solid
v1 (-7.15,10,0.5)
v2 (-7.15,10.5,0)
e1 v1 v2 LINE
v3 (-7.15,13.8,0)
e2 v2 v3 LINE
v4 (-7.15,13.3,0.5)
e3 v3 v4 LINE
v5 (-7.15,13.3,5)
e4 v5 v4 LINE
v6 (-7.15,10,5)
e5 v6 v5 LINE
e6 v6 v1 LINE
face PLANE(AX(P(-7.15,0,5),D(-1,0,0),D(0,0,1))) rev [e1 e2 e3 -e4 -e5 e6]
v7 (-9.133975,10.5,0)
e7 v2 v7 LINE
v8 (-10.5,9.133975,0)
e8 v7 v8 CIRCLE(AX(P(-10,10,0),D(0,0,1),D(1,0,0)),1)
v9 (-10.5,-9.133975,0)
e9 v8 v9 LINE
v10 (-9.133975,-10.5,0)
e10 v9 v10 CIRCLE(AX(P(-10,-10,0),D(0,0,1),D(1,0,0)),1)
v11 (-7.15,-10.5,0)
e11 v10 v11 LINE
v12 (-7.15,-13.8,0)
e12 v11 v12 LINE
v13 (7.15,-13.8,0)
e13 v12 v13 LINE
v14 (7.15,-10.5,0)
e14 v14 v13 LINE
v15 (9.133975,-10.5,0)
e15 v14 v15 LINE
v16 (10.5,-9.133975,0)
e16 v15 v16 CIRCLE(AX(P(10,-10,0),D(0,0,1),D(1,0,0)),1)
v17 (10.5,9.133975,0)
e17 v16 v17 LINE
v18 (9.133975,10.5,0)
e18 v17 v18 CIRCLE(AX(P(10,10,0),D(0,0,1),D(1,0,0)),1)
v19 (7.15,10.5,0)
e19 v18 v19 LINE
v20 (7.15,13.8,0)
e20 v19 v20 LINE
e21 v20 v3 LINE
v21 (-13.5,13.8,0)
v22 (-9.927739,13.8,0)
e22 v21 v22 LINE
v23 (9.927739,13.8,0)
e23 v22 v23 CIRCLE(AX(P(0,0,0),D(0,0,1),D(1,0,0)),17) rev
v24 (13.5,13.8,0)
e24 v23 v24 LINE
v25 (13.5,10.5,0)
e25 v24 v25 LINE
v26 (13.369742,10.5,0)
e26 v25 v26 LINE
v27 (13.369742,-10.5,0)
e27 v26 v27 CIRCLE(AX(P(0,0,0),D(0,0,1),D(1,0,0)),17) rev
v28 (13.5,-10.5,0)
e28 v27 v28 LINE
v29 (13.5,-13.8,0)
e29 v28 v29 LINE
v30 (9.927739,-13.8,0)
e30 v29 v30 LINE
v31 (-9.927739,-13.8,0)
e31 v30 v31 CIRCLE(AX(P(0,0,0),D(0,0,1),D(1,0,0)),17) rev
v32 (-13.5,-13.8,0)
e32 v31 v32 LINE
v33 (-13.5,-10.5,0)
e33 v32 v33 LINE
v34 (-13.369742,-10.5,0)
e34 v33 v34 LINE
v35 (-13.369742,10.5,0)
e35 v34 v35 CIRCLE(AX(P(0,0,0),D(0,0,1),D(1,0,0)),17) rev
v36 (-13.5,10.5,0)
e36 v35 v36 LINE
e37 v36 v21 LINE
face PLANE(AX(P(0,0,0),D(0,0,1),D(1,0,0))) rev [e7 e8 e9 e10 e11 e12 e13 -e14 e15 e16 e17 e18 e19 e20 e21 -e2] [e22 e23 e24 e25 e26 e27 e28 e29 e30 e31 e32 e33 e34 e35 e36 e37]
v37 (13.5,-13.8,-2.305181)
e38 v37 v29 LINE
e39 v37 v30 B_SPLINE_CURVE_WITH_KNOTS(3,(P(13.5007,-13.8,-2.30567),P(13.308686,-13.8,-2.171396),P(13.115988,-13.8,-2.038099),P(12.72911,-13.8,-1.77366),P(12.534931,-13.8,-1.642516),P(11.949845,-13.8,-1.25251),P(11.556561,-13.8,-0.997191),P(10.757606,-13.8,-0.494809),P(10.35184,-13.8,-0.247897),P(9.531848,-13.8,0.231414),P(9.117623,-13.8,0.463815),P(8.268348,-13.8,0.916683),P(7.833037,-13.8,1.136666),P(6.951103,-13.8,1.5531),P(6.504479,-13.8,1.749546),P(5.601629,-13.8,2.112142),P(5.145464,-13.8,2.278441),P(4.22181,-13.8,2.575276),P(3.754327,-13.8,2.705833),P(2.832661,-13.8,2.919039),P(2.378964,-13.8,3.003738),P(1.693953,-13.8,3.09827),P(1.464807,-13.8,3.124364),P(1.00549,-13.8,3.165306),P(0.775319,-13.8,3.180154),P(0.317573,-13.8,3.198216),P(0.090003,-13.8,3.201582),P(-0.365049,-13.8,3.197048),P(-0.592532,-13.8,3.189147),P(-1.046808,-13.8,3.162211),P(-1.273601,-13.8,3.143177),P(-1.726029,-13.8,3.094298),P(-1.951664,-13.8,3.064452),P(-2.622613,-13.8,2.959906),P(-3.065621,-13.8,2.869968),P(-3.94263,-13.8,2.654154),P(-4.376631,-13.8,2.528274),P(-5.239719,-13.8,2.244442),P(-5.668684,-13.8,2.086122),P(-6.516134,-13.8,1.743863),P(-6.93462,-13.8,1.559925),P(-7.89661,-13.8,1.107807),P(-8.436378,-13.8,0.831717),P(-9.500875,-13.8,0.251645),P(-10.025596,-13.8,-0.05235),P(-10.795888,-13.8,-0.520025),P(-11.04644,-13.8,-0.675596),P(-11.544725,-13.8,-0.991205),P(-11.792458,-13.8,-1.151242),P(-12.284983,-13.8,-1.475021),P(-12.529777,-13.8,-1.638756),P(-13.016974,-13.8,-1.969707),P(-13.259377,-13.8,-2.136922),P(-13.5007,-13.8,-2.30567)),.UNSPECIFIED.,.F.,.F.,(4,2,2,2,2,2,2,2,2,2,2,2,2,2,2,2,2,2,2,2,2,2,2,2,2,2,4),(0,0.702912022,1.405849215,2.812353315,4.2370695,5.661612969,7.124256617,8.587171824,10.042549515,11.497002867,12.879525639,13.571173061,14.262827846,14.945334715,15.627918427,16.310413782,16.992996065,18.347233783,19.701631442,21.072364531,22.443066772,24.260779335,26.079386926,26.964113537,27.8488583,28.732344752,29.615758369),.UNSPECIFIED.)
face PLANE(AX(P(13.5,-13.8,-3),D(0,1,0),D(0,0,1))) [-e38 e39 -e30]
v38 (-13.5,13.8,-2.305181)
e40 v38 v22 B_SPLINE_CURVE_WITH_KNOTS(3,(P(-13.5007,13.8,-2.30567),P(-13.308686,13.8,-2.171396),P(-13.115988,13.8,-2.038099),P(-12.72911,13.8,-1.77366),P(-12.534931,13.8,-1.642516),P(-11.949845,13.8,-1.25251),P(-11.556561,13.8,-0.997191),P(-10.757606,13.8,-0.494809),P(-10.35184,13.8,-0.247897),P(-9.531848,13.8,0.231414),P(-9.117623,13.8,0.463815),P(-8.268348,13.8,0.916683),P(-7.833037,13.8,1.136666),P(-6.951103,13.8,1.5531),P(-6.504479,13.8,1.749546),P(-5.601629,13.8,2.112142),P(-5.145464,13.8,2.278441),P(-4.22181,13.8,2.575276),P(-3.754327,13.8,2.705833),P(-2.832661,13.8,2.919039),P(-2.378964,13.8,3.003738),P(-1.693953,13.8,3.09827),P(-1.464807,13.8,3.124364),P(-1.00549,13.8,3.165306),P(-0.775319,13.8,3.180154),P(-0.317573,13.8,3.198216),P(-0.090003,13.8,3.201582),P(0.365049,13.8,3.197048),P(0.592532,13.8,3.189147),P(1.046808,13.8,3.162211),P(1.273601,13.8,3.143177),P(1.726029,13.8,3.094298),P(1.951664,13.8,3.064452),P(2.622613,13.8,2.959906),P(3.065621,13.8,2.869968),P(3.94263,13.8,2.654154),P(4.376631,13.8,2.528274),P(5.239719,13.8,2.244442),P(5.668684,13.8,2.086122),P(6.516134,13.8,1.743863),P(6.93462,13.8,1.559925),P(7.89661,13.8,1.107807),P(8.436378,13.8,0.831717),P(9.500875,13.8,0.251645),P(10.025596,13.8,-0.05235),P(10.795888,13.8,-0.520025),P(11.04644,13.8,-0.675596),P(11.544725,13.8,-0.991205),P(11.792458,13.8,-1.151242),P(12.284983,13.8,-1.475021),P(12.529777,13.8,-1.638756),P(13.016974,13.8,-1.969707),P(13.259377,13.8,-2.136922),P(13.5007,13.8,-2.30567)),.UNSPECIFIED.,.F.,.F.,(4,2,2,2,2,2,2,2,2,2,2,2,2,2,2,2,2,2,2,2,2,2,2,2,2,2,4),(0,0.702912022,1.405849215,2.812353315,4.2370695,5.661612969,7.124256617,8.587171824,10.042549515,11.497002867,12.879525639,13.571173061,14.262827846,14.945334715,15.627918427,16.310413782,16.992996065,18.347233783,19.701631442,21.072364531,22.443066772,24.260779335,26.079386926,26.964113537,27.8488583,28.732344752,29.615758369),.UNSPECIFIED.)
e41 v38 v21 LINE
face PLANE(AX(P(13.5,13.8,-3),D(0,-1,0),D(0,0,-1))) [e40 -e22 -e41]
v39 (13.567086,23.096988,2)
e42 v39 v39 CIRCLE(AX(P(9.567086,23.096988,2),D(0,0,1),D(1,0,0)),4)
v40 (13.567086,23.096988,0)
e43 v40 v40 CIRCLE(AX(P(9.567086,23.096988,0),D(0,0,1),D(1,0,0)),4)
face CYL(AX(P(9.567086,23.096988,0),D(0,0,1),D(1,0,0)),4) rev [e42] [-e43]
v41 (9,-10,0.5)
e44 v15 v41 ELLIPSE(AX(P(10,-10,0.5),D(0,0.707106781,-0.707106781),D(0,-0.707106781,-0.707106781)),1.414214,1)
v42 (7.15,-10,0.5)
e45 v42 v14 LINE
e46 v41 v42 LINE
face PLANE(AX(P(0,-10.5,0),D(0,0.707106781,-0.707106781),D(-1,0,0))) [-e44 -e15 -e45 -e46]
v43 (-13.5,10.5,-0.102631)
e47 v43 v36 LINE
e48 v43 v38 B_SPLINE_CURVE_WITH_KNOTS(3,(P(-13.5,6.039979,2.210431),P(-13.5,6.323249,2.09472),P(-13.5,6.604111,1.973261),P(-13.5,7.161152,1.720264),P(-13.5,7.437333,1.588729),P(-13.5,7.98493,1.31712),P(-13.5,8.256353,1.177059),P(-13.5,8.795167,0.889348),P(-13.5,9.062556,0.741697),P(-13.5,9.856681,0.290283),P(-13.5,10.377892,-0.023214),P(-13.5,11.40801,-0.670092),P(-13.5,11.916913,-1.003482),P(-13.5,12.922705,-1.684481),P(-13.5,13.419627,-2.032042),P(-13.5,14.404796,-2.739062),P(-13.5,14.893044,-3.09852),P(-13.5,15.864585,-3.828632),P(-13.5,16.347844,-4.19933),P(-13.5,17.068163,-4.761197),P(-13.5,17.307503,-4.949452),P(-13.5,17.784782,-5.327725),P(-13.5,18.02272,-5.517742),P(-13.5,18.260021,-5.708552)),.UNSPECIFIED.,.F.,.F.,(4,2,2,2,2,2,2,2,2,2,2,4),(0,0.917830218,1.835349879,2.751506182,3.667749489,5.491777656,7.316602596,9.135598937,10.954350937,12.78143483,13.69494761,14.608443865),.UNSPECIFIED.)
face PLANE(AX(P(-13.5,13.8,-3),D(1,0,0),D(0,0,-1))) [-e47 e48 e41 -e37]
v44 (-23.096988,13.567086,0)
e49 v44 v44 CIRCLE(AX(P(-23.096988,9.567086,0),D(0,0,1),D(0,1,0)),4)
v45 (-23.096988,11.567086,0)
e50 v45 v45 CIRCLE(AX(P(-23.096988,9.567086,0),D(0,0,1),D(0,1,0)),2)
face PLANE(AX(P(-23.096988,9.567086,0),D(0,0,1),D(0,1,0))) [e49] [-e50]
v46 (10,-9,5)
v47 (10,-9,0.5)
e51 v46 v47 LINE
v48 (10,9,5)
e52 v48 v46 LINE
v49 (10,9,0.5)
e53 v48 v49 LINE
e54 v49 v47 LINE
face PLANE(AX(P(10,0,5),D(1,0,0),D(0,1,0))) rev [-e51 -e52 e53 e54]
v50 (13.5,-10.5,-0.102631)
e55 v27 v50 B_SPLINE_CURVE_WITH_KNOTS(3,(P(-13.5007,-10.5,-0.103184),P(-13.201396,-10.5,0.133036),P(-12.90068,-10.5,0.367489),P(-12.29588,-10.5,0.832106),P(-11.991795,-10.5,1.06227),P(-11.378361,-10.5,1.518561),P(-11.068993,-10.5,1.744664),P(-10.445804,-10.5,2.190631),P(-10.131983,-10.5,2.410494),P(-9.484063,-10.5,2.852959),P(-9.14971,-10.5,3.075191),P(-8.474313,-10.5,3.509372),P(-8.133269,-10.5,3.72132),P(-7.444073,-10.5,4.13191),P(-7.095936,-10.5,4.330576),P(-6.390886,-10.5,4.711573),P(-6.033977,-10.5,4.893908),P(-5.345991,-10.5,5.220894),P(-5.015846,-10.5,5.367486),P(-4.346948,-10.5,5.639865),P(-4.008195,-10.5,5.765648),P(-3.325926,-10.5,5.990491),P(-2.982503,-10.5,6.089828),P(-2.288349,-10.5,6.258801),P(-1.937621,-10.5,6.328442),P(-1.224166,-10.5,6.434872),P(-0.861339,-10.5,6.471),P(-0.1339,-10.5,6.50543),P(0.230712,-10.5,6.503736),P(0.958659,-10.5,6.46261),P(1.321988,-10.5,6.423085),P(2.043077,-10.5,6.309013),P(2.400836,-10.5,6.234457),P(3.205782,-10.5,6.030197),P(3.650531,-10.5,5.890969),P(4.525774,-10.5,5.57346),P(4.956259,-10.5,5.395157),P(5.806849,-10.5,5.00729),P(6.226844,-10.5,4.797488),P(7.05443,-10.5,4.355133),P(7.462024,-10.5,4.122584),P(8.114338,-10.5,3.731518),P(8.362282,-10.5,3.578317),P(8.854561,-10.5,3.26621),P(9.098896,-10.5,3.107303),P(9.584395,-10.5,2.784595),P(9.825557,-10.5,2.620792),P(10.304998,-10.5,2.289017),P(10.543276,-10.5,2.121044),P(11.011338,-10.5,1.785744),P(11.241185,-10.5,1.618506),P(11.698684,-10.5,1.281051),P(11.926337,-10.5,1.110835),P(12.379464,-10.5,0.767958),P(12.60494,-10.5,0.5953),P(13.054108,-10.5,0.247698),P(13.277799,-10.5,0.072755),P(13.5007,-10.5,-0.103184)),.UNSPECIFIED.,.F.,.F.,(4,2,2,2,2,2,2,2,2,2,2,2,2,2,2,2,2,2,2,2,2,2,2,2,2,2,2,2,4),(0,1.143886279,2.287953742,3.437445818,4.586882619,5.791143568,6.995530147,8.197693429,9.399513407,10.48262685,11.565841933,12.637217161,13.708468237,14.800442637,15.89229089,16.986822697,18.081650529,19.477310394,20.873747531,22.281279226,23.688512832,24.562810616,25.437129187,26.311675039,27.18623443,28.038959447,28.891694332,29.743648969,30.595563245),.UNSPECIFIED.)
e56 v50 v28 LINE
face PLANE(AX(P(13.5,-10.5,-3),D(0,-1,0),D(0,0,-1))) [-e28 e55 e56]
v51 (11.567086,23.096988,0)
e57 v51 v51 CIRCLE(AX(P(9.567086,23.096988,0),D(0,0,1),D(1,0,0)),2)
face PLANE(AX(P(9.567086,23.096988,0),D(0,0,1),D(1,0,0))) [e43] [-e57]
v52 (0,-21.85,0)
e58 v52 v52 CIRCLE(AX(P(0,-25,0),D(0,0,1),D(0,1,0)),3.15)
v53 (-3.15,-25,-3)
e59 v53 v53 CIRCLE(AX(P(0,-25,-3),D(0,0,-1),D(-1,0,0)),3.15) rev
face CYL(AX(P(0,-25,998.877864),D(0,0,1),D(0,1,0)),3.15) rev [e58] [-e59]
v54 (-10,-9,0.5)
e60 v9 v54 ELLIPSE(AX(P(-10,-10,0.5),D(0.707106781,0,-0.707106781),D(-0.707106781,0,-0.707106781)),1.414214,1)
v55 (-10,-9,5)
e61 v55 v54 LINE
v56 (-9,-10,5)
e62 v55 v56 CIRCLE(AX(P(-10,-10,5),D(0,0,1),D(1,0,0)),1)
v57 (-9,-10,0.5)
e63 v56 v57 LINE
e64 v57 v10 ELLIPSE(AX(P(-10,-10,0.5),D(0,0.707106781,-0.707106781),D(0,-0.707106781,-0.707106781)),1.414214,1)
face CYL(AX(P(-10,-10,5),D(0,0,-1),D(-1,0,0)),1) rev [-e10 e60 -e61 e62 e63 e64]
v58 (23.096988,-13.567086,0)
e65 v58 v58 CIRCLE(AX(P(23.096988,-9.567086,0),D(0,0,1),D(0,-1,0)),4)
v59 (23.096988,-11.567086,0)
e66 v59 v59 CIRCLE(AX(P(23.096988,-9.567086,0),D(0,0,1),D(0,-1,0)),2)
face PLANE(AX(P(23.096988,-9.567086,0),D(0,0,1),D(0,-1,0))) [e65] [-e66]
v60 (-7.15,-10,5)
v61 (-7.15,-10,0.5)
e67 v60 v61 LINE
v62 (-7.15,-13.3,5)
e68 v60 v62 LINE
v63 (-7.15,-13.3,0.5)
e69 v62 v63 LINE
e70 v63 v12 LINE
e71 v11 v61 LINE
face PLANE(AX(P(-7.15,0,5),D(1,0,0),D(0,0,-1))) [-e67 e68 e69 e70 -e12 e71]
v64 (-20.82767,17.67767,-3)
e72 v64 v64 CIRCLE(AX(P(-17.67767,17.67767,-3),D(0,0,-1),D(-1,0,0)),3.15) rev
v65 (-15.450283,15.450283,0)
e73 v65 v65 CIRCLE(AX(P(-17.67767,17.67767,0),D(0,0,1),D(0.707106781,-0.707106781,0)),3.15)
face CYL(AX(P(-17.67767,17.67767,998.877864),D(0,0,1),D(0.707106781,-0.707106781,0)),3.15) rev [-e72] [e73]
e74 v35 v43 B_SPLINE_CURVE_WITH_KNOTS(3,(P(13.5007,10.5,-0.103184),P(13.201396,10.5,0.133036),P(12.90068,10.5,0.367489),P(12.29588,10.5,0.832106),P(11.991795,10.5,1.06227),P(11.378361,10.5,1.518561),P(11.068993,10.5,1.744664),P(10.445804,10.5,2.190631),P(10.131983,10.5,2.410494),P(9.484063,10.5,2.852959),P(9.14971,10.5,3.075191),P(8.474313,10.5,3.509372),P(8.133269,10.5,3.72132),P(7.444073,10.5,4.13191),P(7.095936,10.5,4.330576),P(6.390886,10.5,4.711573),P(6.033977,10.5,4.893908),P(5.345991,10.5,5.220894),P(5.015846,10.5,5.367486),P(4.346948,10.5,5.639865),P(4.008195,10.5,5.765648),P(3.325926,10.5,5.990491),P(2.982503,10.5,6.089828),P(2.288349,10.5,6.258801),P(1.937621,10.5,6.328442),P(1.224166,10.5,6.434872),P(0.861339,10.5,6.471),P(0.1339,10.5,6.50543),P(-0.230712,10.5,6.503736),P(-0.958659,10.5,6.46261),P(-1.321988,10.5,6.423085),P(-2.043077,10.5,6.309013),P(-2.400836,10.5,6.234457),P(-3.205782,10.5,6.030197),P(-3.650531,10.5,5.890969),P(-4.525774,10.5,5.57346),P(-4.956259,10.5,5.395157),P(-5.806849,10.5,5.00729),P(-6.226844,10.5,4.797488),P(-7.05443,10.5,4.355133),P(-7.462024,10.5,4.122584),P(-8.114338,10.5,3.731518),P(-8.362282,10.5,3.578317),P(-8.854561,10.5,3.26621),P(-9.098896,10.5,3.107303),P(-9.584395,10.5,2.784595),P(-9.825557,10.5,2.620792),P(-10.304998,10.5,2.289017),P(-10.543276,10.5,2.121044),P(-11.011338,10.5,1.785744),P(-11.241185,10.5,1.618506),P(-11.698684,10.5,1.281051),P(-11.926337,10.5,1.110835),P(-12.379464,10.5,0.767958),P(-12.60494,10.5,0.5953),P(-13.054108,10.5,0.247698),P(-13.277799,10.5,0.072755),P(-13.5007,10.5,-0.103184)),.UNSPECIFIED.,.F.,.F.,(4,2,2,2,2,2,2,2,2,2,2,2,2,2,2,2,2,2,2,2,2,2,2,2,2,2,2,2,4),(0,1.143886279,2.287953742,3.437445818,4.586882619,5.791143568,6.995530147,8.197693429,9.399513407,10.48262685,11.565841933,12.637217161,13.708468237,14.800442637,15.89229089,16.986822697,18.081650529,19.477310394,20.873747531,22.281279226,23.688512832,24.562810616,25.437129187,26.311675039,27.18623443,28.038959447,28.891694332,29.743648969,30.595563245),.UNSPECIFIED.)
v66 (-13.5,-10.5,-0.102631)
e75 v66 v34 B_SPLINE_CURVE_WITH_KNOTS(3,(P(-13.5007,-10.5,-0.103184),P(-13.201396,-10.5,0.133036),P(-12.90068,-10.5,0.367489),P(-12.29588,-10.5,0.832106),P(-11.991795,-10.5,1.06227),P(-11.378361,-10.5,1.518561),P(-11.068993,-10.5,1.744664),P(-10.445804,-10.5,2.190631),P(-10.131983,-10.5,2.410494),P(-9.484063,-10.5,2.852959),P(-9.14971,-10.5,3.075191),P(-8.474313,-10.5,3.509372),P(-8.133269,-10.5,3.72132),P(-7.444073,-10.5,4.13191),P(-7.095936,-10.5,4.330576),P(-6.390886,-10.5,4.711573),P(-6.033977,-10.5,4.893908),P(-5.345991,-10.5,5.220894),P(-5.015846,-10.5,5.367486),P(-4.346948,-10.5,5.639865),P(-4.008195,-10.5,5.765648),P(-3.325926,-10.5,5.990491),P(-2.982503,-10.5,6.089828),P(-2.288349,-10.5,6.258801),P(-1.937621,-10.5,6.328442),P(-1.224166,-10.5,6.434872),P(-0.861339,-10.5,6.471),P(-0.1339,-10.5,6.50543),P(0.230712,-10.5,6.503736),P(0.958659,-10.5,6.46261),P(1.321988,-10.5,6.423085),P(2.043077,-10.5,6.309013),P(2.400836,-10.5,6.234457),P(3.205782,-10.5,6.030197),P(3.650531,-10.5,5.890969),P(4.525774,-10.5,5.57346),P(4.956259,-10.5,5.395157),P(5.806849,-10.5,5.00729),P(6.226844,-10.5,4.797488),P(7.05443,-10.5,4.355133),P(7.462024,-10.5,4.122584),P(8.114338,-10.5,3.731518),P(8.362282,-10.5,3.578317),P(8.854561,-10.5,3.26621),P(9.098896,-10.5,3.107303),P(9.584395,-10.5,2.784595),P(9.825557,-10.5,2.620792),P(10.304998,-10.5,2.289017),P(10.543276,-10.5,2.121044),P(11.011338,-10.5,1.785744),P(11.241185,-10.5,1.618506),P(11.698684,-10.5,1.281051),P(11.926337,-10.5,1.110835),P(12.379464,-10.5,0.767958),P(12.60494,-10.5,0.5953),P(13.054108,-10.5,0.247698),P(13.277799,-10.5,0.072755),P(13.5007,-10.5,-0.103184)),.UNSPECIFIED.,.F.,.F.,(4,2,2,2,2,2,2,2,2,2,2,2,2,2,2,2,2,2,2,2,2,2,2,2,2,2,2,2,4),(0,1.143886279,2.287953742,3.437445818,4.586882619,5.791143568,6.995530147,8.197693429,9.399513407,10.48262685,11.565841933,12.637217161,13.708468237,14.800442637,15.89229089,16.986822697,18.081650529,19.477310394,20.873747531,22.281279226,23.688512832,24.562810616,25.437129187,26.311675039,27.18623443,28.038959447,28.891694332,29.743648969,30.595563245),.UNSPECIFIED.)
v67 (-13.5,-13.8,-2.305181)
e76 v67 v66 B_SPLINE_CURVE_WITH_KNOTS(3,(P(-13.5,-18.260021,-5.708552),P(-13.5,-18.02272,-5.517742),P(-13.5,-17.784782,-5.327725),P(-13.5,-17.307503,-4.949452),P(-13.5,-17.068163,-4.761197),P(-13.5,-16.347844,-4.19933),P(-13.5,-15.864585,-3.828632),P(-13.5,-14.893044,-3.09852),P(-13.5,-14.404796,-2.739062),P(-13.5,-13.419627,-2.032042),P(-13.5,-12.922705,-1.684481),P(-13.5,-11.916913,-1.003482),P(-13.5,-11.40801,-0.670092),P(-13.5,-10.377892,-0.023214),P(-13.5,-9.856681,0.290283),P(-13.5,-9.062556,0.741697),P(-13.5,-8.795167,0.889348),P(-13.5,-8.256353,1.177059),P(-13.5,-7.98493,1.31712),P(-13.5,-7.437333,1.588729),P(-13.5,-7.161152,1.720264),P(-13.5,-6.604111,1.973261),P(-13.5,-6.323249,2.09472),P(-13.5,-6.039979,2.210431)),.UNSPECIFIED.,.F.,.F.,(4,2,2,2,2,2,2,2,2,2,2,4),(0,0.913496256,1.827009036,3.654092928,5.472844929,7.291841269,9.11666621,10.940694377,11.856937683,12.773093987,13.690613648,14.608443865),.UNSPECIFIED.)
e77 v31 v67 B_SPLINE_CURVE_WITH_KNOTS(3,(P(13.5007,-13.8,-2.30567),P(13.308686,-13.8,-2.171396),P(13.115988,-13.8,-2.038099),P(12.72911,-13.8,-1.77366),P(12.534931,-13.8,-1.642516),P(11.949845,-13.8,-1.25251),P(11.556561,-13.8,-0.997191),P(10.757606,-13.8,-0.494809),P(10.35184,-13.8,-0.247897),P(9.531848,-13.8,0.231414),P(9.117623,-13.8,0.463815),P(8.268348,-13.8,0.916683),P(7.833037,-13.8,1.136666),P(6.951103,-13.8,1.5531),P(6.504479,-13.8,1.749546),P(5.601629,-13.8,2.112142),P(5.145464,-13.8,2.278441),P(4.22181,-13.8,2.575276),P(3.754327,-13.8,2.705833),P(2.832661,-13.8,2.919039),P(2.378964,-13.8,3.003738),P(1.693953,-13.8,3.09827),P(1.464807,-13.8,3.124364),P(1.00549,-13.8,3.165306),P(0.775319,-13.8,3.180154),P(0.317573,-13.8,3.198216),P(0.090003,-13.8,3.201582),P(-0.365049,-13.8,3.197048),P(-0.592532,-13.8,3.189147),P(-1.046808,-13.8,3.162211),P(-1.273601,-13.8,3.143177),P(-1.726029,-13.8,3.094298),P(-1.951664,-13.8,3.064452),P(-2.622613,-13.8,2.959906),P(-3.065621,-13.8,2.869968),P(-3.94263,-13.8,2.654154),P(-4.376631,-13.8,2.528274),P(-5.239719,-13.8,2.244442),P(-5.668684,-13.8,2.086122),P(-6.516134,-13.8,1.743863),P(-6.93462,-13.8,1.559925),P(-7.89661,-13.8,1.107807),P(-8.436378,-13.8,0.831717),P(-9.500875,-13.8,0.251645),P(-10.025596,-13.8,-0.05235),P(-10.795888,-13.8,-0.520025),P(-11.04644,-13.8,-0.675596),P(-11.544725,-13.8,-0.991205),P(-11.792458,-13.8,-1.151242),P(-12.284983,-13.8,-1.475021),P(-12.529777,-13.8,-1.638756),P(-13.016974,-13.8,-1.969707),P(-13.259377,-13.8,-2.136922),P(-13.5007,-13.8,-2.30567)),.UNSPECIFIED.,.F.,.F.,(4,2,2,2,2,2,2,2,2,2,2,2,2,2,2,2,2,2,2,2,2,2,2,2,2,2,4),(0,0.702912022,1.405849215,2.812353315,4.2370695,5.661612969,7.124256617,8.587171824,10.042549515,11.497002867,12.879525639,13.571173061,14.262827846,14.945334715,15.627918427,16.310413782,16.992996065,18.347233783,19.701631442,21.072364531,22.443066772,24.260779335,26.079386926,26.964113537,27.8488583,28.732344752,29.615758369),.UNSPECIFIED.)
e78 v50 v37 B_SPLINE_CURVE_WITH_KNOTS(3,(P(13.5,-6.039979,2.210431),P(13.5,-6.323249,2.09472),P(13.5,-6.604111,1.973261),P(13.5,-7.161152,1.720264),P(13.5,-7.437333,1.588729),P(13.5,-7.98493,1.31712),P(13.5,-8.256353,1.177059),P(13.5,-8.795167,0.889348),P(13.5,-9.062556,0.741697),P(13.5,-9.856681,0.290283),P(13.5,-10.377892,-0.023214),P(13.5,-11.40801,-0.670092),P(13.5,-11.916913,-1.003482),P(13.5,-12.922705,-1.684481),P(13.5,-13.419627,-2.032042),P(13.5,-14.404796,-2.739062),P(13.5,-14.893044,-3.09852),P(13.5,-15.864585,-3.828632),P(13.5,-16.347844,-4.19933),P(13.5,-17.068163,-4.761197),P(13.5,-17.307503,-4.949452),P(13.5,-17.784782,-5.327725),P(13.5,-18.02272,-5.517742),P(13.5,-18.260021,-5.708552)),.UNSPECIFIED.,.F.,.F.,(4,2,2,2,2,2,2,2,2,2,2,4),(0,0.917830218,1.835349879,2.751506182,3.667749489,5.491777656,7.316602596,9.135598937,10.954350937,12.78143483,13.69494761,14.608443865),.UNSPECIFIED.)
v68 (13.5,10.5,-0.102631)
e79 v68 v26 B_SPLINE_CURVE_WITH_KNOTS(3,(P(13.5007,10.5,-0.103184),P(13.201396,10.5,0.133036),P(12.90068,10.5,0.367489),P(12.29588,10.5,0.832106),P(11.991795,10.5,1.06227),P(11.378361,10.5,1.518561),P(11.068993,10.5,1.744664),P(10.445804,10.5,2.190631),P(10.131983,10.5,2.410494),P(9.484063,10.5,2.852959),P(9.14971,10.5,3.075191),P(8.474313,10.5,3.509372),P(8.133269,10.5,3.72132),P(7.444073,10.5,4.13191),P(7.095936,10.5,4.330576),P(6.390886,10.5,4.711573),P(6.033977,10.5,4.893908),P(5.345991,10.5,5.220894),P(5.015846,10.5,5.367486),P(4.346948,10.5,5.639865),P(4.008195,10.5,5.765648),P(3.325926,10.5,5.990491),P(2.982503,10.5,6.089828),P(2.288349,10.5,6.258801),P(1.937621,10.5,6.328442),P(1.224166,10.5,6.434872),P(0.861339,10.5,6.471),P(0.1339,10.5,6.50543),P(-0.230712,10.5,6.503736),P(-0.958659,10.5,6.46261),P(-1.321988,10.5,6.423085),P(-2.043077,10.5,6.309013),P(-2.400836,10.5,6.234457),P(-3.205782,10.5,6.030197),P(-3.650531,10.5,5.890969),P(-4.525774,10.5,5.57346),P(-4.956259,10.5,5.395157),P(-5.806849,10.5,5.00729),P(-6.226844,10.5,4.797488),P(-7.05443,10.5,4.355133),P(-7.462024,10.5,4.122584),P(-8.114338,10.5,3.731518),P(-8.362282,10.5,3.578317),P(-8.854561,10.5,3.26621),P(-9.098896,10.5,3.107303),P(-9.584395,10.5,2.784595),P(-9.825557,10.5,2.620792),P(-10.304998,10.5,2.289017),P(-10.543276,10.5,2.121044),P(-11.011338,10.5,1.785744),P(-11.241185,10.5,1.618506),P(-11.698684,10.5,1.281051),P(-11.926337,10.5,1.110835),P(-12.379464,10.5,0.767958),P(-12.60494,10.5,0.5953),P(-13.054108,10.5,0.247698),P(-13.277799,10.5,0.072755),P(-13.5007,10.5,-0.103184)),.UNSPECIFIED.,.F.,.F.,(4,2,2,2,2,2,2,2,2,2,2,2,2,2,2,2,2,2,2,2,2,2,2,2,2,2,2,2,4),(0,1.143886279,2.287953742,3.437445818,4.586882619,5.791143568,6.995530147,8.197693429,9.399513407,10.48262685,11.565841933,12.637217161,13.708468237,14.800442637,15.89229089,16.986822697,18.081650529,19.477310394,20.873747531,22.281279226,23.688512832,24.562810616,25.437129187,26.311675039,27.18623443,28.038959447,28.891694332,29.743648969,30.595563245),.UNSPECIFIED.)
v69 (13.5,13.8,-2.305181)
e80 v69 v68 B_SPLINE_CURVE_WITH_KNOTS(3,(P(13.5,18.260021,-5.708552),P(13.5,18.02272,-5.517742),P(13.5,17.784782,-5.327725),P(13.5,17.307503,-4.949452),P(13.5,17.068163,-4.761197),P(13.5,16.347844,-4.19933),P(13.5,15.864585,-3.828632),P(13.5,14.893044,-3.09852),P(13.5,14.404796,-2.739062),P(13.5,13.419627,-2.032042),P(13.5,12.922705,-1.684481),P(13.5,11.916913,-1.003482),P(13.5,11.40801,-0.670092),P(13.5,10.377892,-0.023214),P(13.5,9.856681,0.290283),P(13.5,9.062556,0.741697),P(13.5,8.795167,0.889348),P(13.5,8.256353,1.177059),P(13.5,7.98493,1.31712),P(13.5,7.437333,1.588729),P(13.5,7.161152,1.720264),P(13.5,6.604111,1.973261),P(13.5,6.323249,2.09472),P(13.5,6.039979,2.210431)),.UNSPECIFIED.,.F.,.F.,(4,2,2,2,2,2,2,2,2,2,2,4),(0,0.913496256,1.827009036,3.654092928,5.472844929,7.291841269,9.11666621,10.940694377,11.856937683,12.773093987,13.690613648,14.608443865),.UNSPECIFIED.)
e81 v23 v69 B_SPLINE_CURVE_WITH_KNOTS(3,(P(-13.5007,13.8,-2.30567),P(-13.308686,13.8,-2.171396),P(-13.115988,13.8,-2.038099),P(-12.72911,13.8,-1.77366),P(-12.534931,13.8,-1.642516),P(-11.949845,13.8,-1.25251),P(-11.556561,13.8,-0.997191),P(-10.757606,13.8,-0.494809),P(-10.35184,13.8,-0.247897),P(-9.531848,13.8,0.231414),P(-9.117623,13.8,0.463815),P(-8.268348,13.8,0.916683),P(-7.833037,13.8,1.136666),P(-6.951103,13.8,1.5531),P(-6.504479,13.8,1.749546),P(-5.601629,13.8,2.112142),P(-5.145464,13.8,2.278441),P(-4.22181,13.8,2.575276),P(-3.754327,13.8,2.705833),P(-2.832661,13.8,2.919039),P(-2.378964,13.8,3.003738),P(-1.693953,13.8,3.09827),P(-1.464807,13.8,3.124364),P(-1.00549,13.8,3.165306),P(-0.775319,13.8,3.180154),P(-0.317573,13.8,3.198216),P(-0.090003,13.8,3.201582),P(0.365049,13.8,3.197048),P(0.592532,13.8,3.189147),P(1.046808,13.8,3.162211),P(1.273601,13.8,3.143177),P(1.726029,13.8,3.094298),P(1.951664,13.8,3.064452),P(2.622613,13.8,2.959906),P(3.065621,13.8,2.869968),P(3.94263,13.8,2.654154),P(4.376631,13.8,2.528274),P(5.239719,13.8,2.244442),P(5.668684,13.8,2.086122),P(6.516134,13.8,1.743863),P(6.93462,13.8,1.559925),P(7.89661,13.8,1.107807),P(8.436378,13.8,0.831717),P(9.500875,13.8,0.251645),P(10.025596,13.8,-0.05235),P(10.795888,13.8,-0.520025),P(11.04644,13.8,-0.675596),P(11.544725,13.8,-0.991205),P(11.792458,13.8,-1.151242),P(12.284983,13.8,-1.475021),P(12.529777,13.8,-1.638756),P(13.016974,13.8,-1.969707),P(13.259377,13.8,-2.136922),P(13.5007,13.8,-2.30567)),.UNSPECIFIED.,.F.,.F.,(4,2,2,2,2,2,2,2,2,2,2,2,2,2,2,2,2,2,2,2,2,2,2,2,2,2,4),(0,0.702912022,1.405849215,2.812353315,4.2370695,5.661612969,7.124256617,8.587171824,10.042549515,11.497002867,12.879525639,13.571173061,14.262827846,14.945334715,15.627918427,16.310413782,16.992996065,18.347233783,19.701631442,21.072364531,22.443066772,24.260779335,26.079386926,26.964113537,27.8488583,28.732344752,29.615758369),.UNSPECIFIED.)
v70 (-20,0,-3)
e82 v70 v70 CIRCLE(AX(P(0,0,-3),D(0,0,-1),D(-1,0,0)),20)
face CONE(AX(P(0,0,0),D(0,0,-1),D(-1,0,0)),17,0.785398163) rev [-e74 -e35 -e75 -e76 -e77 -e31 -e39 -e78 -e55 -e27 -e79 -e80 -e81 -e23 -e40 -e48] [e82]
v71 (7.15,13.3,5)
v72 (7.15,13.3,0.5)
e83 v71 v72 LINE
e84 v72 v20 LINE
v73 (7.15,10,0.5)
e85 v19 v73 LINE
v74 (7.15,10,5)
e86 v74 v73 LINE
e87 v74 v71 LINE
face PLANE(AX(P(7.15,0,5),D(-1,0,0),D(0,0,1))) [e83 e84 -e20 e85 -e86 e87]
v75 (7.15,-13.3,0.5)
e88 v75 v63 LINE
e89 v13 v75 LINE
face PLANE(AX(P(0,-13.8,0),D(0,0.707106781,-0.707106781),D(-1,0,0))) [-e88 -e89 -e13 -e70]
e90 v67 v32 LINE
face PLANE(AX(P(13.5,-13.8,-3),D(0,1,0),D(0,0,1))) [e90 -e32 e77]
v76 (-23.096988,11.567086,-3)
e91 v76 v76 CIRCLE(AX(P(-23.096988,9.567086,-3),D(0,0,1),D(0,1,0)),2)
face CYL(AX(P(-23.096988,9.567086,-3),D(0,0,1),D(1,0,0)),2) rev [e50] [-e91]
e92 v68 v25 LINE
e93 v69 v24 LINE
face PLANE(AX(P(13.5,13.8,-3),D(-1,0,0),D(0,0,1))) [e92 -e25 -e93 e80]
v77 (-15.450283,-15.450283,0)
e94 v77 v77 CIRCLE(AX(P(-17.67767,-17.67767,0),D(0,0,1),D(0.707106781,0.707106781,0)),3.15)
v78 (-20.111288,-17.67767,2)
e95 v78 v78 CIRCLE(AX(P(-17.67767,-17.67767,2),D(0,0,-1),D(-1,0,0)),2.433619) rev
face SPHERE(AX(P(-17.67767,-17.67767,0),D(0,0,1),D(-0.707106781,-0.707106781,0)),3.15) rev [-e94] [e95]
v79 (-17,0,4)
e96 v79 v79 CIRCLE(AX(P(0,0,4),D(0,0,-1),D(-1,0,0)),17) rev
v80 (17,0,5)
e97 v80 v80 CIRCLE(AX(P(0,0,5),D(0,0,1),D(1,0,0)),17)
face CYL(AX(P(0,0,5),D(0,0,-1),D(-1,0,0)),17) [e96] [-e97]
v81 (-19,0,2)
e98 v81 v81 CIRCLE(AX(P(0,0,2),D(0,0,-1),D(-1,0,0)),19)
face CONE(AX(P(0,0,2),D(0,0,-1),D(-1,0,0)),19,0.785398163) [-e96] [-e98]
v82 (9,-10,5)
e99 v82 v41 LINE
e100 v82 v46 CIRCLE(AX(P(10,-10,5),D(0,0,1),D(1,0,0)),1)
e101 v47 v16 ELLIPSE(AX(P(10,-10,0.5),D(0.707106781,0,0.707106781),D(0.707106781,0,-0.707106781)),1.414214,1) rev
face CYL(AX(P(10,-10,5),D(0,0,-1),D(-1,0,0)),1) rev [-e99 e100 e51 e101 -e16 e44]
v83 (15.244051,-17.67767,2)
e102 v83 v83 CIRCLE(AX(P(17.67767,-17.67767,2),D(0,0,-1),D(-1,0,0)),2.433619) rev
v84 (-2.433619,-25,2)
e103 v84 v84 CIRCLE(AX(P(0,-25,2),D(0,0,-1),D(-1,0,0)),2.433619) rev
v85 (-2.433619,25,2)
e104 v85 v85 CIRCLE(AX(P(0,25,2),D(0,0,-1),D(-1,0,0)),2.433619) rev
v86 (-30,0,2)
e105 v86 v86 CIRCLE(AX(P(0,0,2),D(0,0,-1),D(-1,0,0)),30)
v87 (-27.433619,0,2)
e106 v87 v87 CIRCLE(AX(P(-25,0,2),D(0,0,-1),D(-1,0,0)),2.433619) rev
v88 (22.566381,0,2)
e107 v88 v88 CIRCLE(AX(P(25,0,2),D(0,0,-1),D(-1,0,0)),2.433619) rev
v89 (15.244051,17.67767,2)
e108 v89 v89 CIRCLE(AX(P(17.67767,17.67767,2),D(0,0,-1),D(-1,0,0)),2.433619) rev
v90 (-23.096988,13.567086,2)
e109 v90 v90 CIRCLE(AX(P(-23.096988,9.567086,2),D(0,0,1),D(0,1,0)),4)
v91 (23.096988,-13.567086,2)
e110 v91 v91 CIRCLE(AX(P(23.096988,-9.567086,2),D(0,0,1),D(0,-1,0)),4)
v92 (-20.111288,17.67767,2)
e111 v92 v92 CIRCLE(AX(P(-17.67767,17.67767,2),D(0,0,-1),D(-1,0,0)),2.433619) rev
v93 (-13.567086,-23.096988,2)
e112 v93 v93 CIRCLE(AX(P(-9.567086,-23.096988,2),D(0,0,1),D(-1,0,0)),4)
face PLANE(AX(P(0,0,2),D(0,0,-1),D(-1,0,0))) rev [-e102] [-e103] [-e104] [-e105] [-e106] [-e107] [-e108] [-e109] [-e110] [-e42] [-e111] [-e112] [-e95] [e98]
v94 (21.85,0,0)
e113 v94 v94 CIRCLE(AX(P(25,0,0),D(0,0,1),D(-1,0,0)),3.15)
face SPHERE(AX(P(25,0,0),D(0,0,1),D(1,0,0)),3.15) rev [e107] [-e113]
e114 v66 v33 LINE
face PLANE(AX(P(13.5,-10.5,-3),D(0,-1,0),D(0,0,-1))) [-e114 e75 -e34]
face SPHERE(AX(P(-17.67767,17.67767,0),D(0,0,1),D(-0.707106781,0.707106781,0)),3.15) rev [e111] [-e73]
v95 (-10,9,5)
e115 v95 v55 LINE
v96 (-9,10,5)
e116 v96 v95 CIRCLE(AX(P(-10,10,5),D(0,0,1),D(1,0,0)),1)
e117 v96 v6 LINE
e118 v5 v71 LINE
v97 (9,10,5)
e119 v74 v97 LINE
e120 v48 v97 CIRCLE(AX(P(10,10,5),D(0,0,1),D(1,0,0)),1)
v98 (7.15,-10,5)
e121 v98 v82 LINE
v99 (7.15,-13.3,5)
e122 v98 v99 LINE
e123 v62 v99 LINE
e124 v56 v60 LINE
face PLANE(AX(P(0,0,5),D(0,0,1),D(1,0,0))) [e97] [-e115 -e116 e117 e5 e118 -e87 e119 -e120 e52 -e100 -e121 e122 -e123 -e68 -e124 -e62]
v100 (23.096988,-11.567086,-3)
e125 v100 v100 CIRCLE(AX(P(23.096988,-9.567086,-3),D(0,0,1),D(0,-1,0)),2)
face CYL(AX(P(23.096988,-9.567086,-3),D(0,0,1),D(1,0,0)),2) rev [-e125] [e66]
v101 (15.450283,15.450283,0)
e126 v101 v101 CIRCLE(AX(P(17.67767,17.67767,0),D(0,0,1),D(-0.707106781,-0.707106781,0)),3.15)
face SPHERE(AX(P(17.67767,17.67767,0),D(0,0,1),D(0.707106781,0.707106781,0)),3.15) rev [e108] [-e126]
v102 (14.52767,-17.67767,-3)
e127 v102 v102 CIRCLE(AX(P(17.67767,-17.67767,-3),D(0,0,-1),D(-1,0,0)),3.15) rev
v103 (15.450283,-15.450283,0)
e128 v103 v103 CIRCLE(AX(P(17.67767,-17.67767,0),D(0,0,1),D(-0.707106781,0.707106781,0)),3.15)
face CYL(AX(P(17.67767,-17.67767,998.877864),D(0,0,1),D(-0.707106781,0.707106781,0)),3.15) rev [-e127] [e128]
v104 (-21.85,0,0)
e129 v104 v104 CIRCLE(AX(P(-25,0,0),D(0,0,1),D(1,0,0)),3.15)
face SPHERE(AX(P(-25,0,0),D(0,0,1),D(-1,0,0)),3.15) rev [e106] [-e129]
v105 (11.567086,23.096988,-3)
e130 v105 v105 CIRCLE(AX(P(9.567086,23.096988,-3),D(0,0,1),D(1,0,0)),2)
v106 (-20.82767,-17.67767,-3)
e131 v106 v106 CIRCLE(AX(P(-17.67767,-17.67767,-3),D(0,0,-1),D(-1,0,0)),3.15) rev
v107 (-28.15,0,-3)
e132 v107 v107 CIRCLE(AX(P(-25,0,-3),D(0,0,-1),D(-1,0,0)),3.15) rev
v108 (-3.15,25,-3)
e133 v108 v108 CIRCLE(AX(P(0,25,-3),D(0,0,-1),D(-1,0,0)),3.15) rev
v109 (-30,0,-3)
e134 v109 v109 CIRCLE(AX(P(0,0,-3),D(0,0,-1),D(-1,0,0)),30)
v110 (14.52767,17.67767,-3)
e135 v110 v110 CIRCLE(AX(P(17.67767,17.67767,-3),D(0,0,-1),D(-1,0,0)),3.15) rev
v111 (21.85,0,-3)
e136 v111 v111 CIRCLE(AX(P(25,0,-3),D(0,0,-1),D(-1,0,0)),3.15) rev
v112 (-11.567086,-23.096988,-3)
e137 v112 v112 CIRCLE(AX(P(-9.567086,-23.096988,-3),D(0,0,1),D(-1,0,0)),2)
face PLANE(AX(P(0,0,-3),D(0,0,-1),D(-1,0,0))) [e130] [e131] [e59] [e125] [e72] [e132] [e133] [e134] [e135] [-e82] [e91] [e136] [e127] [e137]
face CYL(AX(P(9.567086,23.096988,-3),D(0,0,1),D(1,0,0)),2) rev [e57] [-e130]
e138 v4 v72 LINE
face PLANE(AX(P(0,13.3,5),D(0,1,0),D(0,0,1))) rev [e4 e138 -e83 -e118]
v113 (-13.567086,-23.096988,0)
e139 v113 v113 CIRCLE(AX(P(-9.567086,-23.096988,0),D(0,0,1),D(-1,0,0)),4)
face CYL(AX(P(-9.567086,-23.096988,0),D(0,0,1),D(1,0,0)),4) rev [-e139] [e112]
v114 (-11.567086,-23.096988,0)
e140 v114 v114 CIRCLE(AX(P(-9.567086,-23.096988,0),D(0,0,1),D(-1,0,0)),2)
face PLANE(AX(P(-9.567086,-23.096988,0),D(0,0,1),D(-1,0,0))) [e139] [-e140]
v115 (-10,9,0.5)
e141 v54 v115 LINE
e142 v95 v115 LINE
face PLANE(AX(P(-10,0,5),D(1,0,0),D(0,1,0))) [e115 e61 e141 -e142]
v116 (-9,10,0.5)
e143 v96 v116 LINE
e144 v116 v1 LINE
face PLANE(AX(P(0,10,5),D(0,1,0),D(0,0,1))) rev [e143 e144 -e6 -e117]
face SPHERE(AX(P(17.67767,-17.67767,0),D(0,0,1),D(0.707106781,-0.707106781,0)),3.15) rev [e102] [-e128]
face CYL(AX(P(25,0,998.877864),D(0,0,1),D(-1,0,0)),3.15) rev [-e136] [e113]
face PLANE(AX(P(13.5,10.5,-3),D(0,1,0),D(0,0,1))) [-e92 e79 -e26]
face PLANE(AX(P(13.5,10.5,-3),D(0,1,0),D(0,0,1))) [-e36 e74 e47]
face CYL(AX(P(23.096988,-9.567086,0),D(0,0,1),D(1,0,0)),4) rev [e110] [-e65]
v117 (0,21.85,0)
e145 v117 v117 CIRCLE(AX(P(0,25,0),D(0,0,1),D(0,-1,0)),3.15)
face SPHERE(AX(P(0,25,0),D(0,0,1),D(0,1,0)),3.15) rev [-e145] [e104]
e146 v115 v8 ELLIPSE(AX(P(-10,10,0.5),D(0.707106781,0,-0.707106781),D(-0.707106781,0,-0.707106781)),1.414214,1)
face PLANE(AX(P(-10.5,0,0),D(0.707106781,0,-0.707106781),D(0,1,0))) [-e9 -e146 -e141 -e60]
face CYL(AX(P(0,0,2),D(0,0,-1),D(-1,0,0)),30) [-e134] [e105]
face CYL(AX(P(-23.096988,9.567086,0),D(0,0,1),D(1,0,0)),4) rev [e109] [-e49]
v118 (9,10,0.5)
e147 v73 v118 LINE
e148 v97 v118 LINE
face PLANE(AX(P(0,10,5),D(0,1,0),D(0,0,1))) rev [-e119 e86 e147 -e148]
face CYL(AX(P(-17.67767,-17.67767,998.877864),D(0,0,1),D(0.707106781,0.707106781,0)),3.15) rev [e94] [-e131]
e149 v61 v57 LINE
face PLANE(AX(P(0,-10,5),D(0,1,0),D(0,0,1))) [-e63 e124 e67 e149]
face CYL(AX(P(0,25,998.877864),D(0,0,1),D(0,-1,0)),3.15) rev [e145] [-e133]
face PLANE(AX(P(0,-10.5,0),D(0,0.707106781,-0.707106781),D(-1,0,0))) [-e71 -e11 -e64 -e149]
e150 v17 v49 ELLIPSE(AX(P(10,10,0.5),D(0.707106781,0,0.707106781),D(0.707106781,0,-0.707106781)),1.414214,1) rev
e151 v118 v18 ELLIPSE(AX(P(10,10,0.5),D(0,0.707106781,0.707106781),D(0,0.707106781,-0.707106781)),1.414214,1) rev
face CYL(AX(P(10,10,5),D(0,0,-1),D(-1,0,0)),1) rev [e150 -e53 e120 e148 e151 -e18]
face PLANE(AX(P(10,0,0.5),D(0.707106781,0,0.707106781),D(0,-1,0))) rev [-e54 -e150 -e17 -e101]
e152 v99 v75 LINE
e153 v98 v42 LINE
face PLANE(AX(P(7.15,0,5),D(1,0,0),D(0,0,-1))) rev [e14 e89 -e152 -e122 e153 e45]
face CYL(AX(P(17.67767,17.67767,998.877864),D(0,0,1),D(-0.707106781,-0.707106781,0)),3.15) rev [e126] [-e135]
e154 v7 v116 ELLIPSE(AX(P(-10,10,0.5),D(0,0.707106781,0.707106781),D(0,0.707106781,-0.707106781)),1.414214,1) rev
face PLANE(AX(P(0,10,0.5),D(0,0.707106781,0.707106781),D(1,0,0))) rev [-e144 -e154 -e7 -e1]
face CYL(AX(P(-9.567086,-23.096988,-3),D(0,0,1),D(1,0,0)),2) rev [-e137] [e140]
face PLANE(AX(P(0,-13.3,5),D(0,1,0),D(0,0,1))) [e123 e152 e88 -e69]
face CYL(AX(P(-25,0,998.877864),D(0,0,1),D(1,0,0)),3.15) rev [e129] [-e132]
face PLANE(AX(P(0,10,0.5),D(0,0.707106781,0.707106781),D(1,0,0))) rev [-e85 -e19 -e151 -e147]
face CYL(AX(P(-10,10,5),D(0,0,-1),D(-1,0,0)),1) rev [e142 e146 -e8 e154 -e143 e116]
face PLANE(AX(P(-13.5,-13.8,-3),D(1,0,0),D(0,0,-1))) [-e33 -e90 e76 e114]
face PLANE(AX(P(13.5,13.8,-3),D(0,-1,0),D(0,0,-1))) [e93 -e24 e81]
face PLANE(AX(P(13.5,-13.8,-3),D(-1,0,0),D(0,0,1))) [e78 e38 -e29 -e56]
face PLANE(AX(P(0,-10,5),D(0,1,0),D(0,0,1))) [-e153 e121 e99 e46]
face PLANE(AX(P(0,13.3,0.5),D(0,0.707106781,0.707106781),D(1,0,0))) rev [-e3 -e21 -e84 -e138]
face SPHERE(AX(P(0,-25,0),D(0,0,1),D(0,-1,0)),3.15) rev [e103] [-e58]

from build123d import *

# Parameters (mm, degrees)
SKETCH_1_R               = 17
EXTRUDE_1_DEPTH          = 5
SKETCH_2_R               = 30
SKETCH_2_R_2             = 17
EXTRUDE_2_DEPTH          = 2
EXTRUDE_START            = 3
SKETCH_3_R               = 30
SKETCH_3_R_2             = 20
EXTRUDE_3_DEPTH          = 3
CHAMFER_1_SIZE           = 2
PATTERN_CIRCULAR_1_COUNT = 8
SKETCH_6_R               = 4
CUT_EXTRUDE_1_DEPTH      = 2
SKETCH_7_R               = 2
CUT_EXTRUDE_2_DEPTH      = 43.720018727
PATTERN_CIRCULAR_2_COUNT = 4
CHAMFER_2_SIZE           = 0.5
CHAMFER_3_SIZE           = 3
SKETCH_8_W               = 27
SKETCH_8_H               = 3.3
CUT_EXTRUDE_3_DEPTH      = 43.720018727


with BuildPart() as part:
    # 草图1 → 凸台-拉伸1 (new body)
    with BuildSketch(Plane.XY):
        Circle(SKETCH_1_R)
        with BuildLine():
            ThreePointArc((-10, 9), (-10.707106781, 10.707106781), (-9, 10))
            Line((-9, 10), (-7.15, 10))
            Line((-7.15, 10), (-7.15, 13.3))
            Line((-7.15, 13.3), (7.15, 13.3))
            Line((7.15, 13.3), (7.15, 10))
            Line((7.15, 10), (9, 10))
            ThreePointArc((9, 10), (10, 11), (11, 10))
            ThreePointArc((11, 10), (10.707106781, 9.292893219), (10, 9))
            Line((10, 9), (10, -9))
            ThreePointArc((10, -9), (10.707106781, -9.292893219), (11, -10))
            ThreePointArc((11, -10), (10, -11), (9, -10))
            Line((9, -10), (7.15, -10))
            Line((7.15, -10), (7.15, -13.3))
            Line((7.15, -13.3), (-7.15, -13.3))
            Line((-7.15, -13.3), (-7.15, -10))
            Line((-7.15, -10), (-9, -10))
            ThreePointArc((-9, -10), (-10.707106781, -10.707106781), (-10, -9))
            Line((-10, -9), (-10, 9))
        make_face(mode=Mode.SUBTRACT)
    extrude(amount=EXTRUDE_1_DEPTH)

    # 草图2 → 凸台-拉伸2 (add)
    with BuildSketch(Plane(origin=(0, 0, 0), x_dir=(-1, 0, 0), z_dir=(0, 0, -1))):
        Circle(SKETCH_2_R)
        Circle(SKETCH_2_R_2, mode=Mode.SUBTRACT)
    extrude(amount=-EXTRUDE_2_DEPTH)

    # 草图3 → 凸台-拉伸3 (add)
    with BuildSketch(Plane(origin=(0, 0, 0), x_dir=(-1, 0, 0), z_dir=(0, 0, -1)).offset(EXTRUDE_START)):
        Circle(SKETCH_3_R)
        Circle(SKETCH_3_R_2, mode=Mode.SUBTRACT)
    extrude(amount=-EXTRUDE_3_DEPTH)

    # 倒角1
    chamfer_1_edges = [part.edges().sort_by_distance(p)[0] for p in [
        (-17, 0, 2),
    ]]
    chamfer(chamfer_1_edges, length=CHAMFER_1_SIZE)

    # 草图5 → 切除-旋转1 (revolve, cut)
    with BuildSketch(Plane(origin=(0, 0, 0), x_dir=(0, 0, -1), z_dir=(1, 0, 0)), mode=Mode.PRIVATE) as cut_revolve_1_sk:
        with BuildLine():
            Line((-3.15, 25), (3.15, 25))
            Line((3.15, 25), (3.15, 28.15))
            Line((3.15, 28.15), (0, 28.15))
            ThreePointArc((0, 28.15), (-2.227386361, 27.227386361), (-3.15, 25))
        make_face()
    cut_revolve_1 = revolve(cut_revolve_1_sk.sketch.rotate(Axis((0, 25, 998.877863865), (0, 0, -1)), 270), axis=Axis((0, 25, 998.877863865), (0, 0, -1)), mode=Mode.SUBTRACT)

    # 阵列(圆周)1: 切除-旋转1 ×8 about axis
    pattern_circular_1_axis = Axis((0, 0, 0), (0, 0, 1))
    for i in range(1, PATTERN_CIRCULAR_1_COUNT):
        add(cut_revolve_1.rotate(pattern_circular_1_axis, i * 360 / PATTERN_CIRCULAR_1_COUNT), mode=Mode.SUBTRACT)

    # 草图6 → 切除-拉伸1 (cut)
    with BuildSketch(Plane.XY.offset(2)):
        with Locations((9.567085809, 23.096988313)):
            Circle(SKETCH_6_R)
    cut_extrude_1 = extrude(amount=-CUT_EXTRUDE_1_DEPTH, mode=Mode.SUBTRACT)

    # 草图7 → 切除-拉伸2 (cut, through all)
    with BuildSketch(Plane.XY):
        with Locations((9.567085809, 23.096988313)):
            Circle(SKETCH_7_R)
    cut_extrude_2 = extrude(amount=-CUT_EXTRUDE_2_DEPTH, mode=Mode.SUBTRACT)

    # 阵列(圆周)2: 切除-拉伸1, 切除-拉伸2 ×4 about axis
    pattern_circular_2_axis = Axis((0, 0, 0), (0, 0, 1))
    add([cut_extrude_1.rotate(pattern_circular_2_axis, i * 360 / PATTERN_CIRCULAR_2_COUNT) for i in range(1, PATTERN_CIRCULAR_2_COUNT)], mode=Mode.SUBTRACT)
    add([cut_extrude_2.rotate(pattern_circular_2_axis, i * 360 / PATTERN_CIRCULAR_2_COUNT) for i in range(1, PATTERN_CIRCULAR_2_COUNT)], mode=Mode.SUBTRACT)

    # 倒角2
    chamfer_2_edges = [part.edges().sort_by_distance(p)[0] for p in [
        (10, 0, 0),
        (8.075, 10, 0),
        (0, 13.3, 0),
        (-8.075, 10, 0),
        (-10, 0, 0),
        (-8.075, -10, 0),
        (0, -13.3, 0),
        (8.075, -10, 0),
    ]]
    chamfer(chamfer_2_edges, length=CHAMFER_2_SIZE)

    # 倒角3
    chamfer_3_edges = [part.edges().sort_by_distance(p)[0] for p in [
        (20, 0, 0),
    ]]
    chamfer(chamfer_3_edges, length=CHAMFER_3_SIZE - 0.0001)  # a hair under: the kernel refuses the full size

    # 草图8 → 切除-拉伸3 (cut, through all)
    with BuildSketch(Plane(origin=(0, 0, 0), x_dir=(-1, 0, 0), z_dir=(0, 0, -1))):
        with Locations((0, 12.15)):
            Rectangle(SKETCH_8_W, SKETCH_8_H)
        with Locations((0, -12.15)):
            Rectangle(SKETCH_8_W, SKETCH_8_H)
    extrude(amount=CUT_EXTRUDE_3_DEPTH, mode=Mode.SUBTRACT)


solid = part.part
